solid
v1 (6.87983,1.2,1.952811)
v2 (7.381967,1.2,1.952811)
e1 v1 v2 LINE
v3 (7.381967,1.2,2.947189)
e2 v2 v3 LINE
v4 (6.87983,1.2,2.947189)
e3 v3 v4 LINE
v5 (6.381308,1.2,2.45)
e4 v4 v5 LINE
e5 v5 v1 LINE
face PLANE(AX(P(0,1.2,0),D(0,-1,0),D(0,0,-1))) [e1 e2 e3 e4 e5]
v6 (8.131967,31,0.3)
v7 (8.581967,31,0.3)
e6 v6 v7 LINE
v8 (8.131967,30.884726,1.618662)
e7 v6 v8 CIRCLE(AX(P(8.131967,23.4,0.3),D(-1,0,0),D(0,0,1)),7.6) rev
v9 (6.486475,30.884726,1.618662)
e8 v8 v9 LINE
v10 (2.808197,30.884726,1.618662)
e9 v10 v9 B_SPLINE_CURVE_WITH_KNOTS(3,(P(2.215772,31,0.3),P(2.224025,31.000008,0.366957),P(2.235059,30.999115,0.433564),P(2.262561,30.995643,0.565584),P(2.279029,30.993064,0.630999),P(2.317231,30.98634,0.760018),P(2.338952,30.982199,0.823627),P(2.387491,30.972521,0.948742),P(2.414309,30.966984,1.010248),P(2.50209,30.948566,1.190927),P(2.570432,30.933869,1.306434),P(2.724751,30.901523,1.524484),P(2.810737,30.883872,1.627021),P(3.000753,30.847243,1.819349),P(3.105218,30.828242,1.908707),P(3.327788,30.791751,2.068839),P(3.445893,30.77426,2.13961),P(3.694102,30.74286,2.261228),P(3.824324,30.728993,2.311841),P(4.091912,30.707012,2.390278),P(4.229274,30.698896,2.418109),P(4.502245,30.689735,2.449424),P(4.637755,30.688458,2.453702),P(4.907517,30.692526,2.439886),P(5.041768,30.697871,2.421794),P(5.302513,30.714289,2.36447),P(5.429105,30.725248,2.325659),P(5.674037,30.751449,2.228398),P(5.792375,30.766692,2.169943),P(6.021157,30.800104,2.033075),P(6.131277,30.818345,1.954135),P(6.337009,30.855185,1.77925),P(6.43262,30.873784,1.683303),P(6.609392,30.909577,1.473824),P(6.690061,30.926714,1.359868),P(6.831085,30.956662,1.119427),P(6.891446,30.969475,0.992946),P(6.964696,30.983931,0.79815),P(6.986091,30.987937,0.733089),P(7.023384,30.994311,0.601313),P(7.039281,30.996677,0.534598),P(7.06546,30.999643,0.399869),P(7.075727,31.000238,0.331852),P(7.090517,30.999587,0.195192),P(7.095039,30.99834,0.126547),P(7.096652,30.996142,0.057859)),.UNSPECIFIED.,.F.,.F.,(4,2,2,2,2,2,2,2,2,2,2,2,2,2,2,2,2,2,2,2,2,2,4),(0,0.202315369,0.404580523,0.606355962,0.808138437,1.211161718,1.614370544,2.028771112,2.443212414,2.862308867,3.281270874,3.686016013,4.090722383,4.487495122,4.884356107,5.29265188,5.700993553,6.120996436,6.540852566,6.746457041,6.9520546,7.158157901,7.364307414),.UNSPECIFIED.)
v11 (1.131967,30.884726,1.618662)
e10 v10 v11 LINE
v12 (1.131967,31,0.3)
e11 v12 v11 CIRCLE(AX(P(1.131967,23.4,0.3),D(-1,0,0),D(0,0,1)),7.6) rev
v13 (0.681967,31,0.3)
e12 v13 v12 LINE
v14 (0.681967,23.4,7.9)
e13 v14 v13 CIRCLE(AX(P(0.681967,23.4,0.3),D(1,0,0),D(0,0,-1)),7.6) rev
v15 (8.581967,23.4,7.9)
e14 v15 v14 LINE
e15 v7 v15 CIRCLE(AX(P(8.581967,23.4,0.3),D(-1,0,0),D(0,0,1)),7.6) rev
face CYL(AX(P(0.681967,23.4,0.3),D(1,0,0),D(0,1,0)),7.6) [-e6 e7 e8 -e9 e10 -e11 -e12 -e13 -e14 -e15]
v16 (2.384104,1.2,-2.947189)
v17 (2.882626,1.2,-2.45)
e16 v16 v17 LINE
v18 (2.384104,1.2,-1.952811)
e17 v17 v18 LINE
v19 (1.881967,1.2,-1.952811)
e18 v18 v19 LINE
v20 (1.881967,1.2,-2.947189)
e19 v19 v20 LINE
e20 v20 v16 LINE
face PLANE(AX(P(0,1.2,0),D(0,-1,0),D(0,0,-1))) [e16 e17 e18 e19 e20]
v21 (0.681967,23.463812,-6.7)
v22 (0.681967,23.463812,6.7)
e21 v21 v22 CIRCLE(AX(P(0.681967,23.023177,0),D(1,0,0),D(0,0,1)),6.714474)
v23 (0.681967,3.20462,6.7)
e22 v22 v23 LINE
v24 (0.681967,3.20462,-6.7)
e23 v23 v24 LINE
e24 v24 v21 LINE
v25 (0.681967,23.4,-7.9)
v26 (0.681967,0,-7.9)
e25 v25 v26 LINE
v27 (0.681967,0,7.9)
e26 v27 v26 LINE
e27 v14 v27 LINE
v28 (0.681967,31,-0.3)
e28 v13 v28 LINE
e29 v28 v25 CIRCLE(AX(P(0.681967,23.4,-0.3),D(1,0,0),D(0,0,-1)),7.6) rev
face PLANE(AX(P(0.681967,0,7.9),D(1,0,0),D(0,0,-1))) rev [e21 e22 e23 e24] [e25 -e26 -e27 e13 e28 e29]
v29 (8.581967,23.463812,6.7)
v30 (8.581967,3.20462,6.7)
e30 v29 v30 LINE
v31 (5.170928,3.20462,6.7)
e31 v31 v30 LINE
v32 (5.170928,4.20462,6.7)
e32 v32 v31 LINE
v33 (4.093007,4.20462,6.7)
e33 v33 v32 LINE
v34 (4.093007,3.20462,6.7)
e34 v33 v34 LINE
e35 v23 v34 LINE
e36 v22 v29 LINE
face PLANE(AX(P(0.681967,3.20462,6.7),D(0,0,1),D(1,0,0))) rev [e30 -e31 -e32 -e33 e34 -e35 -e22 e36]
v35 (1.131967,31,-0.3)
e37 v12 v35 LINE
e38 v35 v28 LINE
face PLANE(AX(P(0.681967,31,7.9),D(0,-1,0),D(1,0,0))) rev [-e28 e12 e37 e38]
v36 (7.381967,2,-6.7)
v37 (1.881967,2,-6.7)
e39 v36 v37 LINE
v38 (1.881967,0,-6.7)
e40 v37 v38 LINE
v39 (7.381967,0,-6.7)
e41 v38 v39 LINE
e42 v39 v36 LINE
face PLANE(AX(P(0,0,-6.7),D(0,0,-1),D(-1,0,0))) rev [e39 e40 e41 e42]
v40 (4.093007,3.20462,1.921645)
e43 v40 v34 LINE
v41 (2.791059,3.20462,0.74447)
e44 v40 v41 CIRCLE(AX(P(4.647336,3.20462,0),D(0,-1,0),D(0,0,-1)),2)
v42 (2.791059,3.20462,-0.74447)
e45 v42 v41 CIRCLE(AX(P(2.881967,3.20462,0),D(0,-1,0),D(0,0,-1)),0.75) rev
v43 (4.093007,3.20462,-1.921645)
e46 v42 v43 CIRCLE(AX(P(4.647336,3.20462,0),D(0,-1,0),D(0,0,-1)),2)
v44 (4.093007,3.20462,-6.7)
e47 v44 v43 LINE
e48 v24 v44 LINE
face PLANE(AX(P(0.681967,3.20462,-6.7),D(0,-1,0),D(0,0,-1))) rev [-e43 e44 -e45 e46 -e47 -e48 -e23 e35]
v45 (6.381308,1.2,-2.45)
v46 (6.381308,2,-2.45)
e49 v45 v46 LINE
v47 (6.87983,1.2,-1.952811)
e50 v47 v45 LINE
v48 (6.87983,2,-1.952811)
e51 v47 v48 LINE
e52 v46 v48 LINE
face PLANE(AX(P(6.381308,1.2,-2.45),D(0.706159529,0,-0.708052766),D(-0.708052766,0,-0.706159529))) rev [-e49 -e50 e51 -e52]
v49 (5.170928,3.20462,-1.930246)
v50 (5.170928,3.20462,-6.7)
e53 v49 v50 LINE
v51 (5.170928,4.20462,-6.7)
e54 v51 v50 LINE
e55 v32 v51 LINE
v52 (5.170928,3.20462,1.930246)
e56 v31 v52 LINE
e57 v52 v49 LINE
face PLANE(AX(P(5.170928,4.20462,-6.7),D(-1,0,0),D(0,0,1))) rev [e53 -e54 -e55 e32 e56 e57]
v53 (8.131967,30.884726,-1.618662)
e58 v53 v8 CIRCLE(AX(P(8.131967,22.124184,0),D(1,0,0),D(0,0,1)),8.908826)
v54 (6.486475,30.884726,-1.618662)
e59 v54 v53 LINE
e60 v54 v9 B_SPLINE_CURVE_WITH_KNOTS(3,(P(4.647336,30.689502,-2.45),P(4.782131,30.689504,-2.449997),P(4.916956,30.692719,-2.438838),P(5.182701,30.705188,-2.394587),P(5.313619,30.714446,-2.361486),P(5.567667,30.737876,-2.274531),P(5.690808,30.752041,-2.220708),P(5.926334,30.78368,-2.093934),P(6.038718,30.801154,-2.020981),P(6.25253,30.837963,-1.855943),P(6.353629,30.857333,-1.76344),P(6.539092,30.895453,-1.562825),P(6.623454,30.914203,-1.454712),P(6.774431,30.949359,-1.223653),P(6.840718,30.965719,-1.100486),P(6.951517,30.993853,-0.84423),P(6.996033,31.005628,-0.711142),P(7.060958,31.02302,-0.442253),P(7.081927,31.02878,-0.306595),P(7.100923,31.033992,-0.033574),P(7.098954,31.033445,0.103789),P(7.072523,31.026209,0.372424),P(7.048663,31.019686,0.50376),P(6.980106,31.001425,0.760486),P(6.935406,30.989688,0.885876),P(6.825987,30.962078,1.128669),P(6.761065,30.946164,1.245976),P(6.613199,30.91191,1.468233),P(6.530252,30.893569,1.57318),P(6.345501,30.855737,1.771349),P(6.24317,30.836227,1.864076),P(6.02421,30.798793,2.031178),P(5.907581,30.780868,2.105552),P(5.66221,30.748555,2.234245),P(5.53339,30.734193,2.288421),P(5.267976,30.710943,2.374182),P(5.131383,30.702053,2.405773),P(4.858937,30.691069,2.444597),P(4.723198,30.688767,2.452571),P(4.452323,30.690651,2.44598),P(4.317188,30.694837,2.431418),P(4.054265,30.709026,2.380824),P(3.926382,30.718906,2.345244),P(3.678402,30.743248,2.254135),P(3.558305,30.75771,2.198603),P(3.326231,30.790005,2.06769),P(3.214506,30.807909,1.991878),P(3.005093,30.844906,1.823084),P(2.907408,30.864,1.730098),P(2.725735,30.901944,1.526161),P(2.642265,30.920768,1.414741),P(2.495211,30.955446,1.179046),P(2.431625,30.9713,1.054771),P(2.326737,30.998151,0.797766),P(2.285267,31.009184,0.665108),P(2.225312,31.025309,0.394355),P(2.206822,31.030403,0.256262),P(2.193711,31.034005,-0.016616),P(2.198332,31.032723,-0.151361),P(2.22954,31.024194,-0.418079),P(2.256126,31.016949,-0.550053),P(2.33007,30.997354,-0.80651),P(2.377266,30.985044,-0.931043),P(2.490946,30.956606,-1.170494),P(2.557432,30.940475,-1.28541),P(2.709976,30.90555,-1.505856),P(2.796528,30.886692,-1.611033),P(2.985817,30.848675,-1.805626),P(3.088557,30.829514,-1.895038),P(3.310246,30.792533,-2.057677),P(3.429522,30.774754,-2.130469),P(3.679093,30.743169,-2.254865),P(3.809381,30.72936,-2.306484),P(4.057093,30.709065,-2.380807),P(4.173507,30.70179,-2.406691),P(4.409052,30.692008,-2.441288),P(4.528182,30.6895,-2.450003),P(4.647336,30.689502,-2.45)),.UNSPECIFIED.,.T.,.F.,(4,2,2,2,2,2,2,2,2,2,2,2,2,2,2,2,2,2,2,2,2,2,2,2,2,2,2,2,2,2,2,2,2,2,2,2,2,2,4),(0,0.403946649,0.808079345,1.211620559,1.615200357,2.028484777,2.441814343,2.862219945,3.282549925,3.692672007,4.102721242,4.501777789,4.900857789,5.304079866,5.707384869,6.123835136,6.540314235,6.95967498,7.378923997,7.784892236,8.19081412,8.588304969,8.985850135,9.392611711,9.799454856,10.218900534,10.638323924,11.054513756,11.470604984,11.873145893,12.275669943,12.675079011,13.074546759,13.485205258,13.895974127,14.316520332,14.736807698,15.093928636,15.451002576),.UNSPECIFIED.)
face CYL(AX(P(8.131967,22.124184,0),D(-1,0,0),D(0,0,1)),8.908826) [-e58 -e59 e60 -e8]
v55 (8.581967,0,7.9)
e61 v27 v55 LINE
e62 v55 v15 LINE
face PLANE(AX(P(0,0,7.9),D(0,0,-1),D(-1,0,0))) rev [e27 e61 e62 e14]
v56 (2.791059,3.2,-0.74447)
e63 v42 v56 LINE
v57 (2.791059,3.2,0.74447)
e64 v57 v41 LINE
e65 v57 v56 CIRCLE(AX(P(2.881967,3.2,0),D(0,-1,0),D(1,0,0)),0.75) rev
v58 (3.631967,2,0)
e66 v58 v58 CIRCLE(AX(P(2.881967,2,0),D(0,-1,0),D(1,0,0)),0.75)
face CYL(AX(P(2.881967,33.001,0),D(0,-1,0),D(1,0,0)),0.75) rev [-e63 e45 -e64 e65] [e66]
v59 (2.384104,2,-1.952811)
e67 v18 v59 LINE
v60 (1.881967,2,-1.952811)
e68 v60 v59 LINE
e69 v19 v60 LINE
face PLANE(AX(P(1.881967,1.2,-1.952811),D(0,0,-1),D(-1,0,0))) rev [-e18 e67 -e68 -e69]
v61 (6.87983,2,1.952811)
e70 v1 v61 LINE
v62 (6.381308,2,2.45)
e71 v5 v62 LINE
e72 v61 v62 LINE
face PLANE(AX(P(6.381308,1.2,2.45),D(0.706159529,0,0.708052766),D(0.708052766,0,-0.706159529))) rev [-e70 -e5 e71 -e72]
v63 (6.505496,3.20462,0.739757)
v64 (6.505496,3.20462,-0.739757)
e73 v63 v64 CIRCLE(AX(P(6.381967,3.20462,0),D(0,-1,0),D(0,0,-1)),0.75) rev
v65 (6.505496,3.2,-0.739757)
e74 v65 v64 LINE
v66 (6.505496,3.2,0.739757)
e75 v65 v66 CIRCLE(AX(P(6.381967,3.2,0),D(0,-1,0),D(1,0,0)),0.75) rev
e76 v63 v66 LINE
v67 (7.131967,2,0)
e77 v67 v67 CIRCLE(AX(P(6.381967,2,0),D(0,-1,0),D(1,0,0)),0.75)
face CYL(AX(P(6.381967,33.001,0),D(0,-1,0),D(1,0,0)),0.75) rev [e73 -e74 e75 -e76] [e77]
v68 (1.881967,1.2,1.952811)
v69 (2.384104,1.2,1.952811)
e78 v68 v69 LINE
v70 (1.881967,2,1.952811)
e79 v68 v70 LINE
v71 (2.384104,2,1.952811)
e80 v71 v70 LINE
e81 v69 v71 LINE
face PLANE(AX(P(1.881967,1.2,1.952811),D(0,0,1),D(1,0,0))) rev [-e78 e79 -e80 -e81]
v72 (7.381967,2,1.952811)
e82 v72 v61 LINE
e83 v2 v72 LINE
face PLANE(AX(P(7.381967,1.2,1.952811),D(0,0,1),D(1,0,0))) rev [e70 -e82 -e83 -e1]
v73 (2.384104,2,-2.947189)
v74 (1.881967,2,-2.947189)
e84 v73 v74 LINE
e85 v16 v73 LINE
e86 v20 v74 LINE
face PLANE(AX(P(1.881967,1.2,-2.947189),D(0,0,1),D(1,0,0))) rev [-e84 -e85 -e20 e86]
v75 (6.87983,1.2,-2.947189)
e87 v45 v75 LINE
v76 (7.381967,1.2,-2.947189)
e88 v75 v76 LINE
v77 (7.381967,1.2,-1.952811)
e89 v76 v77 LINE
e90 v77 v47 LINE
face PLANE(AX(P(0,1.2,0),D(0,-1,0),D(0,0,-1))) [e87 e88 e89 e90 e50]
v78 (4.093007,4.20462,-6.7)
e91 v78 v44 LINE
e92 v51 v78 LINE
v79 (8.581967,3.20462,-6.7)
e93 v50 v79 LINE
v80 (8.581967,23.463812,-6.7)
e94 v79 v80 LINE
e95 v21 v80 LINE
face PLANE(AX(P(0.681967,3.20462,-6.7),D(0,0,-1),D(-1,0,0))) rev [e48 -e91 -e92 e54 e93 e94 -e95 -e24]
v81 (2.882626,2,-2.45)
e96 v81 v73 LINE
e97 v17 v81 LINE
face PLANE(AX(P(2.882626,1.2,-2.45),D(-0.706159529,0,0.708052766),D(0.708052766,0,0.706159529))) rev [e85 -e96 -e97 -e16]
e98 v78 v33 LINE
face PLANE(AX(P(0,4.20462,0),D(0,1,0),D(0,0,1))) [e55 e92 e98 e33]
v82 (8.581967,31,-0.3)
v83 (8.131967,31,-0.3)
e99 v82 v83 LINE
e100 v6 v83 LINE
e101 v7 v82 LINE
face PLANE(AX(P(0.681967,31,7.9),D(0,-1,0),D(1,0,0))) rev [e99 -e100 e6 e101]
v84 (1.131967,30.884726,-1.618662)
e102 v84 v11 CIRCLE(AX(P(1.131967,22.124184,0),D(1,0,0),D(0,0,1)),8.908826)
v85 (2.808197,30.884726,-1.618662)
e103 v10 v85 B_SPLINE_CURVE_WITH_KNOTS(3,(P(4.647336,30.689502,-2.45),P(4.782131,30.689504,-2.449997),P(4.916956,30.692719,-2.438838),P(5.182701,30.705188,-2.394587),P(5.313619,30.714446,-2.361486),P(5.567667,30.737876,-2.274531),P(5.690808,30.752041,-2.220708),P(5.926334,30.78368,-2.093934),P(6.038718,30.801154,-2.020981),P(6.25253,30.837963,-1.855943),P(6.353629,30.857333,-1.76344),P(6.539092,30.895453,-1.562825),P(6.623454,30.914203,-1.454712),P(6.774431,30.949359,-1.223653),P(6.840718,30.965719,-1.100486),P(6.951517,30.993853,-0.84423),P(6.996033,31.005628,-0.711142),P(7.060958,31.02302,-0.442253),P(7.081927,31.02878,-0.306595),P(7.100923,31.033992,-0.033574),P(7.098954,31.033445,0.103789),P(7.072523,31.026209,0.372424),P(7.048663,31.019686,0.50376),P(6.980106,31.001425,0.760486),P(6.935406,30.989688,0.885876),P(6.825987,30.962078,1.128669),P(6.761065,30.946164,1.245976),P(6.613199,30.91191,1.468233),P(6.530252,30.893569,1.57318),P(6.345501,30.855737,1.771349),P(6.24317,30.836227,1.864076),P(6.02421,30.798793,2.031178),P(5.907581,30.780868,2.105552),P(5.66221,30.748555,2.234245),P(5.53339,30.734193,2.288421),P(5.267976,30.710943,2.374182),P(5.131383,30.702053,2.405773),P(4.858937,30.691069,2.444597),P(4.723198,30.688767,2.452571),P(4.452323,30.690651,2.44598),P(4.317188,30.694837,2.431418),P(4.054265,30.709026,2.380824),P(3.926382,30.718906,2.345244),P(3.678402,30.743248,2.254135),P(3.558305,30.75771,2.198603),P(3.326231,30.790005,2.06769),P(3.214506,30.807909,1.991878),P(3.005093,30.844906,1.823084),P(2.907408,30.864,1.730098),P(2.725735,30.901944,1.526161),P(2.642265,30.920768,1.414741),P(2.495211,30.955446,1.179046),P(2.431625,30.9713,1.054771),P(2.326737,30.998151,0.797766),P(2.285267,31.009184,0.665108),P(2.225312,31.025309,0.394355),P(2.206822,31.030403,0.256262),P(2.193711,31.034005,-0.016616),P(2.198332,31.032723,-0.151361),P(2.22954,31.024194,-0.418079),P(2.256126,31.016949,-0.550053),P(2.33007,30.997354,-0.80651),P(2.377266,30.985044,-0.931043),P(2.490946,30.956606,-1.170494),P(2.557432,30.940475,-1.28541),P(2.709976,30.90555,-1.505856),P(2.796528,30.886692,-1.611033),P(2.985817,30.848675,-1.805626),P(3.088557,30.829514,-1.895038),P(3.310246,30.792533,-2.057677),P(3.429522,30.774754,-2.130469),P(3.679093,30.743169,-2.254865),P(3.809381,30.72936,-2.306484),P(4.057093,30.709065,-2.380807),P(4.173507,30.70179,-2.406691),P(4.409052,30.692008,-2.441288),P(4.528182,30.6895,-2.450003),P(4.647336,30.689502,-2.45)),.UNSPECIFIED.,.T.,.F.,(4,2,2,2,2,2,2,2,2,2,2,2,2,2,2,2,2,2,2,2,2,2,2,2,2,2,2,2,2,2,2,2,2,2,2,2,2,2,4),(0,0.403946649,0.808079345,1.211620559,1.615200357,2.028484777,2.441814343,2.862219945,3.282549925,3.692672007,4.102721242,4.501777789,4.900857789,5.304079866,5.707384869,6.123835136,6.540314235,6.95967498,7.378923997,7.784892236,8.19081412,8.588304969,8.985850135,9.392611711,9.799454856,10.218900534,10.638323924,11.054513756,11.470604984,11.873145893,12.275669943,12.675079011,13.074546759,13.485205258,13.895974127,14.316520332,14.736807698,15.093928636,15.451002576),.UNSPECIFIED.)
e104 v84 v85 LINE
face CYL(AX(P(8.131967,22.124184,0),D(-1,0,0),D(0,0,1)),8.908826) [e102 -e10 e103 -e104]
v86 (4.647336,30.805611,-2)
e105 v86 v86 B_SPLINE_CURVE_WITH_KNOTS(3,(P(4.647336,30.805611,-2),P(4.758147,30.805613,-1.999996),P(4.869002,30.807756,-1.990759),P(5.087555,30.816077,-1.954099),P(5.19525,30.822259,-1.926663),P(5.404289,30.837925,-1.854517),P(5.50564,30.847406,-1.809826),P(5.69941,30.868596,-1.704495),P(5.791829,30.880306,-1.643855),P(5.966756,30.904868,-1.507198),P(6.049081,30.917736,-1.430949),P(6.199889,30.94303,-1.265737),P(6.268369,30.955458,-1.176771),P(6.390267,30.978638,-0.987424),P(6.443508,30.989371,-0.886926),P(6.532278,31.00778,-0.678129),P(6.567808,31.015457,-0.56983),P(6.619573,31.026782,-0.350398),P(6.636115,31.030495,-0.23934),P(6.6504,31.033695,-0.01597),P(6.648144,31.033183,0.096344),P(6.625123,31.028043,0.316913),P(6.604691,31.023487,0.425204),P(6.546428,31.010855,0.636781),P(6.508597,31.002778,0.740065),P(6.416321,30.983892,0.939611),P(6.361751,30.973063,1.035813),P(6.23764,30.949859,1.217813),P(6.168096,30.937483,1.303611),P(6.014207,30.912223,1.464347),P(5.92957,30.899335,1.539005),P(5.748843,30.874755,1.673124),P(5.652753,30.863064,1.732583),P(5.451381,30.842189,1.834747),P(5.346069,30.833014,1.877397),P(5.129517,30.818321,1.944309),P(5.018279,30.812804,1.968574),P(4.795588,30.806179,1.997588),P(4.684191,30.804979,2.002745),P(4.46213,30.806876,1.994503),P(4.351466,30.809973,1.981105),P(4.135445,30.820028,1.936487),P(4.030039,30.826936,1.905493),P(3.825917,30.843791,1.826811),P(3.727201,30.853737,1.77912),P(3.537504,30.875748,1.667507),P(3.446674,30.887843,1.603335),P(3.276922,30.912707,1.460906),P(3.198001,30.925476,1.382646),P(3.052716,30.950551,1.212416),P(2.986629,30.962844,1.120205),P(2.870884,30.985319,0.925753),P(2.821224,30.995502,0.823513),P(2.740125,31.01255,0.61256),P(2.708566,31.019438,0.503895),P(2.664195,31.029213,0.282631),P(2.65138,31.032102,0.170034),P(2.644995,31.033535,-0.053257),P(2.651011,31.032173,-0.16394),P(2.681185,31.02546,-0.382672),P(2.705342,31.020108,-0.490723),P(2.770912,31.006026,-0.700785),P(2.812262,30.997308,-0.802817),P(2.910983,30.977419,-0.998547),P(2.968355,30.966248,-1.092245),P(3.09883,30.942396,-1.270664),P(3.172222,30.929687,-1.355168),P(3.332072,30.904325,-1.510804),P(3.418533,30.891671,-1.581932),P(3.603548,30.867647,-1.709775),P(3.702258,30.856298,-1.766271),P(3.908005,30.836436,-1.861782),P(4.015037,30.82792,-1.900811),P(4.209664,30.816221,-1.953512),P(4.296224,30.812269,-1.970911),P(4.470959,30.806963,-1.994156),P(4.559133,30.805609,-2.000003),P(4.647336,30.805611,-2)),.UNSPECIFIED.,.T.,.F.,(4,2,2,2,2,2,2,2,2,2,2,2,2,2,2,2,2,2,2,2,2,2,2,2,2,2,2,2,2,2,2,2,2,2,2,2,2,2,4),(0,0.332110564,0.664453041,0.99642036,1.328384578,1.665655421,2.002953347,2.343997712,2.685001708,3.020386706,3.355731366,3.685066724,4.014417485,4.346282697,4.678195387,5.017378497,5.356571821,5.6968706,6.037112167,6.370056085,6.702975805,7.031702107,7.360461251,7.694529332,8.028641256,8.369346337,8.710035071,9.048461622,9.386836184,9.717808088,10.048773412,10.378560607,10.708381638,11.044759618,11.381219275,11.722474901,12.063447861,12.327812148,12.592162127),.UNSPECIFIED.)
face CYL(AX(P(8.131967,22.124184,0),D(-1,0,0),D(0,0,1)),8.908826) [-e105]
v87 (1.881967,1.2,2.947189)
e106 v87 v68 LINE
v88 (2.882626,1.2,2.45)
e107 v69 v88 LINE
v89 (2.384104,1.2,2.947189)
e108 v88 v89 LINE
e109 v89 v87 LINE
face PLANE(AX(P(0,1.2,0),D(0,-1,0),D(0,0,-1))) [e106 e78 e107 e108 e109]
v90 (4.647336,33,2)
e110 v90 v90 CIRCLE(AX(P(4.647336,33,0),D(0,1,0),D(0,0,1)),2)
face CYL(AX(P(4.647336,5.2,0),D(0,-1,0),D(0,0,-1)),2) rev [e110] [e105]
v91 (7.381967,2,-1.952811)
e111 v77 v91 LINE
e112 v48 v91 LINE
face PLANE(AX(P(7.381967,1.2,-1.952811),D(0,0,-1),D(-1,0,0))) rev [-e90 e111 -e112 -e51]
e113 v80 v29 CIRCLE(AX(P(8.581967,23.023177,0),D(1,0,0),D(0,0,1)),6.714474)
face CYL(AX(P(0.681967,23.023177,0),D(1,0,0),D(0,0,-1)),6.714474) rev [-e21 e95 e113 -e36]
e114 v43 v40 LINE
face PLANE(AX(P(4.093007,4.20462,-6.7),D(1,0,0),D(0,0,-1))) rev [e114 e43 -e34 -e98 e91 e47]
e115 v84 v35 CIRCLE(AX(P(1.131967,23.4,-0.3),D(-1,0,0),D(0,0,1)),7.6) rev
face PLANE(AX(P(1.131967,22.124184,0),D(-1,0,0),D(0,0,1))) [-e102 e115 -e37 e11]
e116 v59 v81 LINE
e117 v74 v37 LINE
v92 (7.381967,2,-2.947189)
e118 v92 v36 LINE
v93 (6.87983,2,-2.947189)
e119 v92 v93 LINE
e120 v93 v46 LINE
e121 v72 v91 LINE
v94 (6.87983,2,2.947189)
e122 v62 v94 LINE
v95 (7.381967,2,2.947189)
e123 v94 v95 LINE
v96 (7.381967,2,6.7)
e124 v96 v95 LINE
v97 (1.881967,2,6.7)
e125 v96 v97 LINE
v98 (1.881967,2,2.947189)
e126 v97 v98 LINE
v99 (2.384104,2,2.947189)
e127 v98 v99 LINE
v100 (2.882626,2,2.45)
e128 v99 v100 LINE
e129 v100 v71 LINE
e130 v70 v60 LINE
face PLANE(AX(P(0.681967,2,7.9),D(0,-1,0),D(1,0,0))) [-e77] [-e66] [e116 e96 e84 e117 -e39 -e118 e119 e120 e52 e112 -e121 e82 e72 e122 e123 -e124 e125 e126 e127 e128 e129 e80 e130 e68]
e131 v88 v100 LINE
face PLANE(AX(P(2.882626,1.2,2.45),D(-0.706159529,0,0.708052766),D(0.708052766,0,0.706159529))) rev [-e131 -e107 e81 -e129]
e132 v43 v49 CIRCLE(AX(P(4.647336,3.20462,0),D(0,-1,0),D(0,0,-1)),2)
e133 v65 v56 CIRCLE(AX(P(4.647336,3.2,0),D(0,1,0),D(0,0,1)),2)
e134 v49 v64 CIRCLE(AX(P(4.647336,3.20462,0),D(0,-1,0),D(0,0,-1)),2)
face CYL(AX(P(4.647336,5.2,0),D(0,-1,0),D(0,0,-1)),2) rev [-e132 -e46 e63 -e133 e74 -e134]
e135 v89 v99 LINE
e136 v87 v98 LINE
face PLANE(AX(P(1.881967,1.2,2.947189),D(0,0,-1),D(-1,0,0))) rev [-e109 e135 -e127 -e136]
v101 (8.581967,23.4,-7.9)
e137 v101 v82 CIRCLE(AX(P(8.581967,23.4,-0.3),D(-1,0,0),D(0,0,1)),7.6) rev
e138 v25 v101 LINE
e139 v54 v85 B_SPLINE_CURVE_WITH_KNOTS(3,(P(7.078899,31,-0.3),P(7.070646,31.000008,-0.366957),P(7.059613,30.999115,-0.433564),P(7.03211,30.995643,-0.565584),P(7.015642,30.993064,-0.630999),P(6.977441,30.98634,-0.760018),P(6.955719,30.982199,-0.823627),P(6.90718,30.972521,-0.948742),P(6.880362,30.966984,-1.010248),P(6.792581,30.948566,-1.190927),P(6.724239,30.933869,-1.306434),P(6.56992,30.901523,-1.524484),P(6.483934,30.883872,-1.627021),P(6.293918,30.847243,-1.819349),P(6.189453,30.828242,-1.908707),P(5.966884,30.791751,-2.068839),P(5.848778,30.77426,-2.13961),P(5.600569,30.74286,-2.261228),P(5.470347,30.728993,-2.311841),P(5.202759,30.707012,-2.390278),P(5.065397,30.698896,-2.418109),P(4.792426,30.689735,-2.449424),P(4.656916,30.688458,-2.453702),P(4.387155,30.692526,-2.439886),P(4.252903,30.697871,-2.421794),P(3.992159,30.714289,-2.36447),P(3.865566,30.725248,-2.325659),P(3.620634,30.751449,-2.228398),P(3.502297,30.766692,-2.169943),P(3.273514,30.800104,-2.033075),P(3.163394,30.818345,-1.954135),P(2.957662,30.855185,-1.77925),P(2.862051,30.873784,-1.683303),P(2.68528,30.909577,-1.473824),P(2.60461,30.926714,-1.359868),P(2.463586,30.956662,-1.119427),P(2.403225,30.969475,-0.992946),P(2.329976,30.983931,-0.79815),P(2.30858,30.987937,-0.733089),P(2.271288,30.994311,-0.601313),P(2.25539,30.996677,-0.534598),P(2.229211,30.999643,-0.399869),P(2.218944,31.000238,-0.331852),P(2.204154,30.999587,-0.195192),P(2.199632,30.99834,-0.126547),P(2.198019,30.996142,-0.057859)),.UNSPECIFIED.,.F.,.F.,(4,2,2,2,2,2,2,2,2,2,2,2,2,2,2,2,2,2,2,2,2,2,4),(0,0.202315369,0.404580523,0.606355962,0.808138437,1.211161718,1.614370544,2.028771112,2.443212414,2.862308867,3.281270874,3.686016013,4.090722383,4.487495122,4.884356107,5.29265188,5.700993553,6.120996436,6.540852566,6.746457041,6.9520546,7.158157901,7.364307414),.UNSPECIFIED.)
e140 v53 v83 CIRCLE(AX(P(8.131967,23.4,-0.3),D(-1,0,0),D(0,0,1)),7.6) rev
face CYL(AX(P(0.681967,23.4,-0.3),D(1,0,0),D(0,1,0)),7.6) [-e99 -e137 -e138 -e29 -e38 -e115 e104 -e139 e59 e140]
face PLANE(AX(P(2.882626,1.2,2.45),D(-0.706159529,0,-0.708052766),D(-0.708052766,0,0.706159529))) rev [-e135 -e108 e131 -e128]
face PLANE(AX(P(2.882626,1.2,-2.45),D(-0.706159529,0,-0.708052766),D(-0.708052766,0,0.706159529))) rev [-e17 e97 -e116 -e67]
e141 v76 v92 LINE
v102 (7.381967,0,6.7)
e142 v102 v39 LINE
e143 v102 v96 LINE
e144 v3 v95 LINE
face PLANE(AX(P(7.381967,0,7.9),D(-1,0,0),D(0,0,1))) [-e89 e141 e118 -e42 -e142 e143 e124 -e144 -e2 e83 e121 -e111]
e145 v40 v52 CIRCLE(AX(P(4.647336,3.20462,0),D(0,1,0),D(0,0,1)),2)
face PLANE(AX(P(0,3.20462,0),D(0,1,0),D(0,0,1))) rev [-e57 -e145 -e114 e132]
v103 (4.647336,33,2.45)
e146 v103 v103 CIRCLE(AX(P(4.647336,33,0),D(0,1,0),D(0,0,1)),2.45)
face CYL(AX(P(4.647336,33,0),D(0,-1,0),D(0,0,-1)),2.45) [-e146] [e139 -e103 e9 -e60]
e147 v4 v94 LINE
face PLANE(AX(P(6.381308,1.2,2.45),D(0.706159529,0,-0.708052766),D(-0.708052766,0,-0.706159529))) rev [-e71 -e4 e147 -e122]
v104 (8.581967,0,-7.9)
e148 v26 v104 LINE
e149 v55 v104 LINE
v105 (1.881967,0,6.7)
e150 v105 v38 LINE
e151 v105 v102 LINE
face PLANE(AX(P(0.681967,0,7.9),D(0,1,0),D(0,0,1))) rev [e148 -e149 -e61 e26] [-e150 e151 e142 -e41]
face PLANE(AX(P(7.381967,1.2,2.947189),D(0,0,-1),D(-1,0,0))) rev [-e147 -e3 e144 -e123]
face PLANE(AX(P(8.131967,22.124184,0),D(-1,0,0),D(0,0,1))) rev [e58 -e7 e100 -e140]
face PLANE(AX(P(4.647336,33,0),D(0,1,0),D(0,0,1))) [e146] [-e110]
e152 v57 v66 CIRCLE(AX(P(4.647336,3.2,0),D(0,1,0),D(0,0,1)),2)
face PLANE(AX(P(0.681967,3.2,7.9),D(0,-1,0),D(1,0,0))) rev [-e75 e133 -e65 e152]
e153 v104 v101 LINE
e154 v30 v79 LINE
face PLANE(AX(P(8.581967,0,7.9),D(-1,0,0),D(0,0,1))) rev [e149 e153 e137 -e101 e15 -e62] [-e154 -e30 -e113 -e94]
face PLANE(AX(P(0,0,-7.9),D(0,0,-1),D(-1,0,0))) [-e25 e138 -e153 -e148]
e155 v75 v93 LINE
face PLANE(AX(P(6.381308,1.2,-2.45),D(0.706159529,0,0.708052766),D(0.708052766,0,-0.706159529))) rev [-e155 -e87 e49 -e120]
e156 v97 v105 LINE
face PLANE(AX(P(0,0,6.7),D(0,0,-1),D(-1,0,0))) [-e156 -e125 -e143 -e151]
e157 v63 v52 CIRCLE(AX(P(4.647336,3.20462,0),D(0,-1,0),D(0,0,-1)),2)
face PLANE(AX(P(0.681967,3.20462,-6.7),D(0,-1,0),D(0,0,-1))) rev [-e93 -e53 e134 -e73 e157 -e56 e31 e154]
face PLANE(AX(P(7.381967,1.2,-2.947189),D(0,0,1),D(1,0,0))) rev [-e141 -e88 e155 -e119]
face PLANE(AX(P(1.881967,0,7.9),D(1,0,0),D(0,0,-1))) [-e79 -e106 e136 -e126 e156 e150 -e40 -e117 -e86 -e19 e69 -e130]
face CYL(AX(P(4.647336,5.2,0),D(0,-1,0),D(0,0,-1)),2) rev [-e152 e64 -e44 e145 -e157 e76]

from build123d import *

# Parameters (mm, degrees)
MAINBASESKETCH_W                 = 7.9
MAINBASESKETCH_H                 = 3.2
MAINBASEEXTRUDE_DEPTH            = 7.9
MAINBASESHELL_T                  = -1.2
SLIMYELLOWUNDEREXT_START         = -0.2
SLIMYELLOWUNDEREXT_DEPTH         = 1
SLIMYELLLOWUPPERCIRCLESKETCH_R   = 2.45
SLIMYELLLOWUPPERCIRCLESKETCH_R_2 = 2
SLIMYELLOWUPPERCIRCLE_DEPTH      = 2
MOVE_START                       = 3.2
MOVE_FACE2_OUTLINE_W             = 7.9
MOVE_FACE2_OUTLINE_H             = 15.8
MOVE_FACE2_OUTLINE_R             = 2
MOVE_FACE2_DEPTH                 = 27.8
MOVE_START_2                     = 31
MOVE_FACE2_2_OUTLINE_R           = 2.45
MOVE_FACE2_2_OUTLINE_R_2         = 2
MOVE_FACE2_2_DEPTH               = 2
FILLET25_R                       = 7.6
FILLET26_R                       = 7.6
CUT_EXTRUDE55_DEPTH              = 35.839919773
CUT_EXTRUDE57_REACH              = 35.122
SKETCH160_R                      = 0.75
BOSS_EXTRUDE20_DEPTH             = 3.5
SKETCH162_W                      = 1.07792119
SKETCH162_H                      = 13.4
BOSS_EXTRUDE21_DEPTH             = 1


# Read off the part's stored shape, not the designer's step: Move Face2
with BuildPart() as part:
    # MainBaseSketch → MainBaseExtrude (new, symmetric)
    with BuildSketch(Plane.XY):
        with Locations((4.631967213, 1.6)):
            Rectangle(MAINBASESKETCH_W, MAINBASESKETCH_H)
    extrude(amount=MAINBASEEXTRUDE_DEPTH, both=True)

    # MainBaseShell
    mainbaseshell_openings = [part.faces().sort_by_distance(p)[0] for p in [
        (4.631967213, 0, 0),
    ]]
    offset(amount=MAINBASESHELL_T, openings=mainbaseshell_openings, kind=Kind.INTERSECTION)

    # SlimYellowUnderExtSketch → SlimYellowUnderExt (add)
    with BuildSketch(Plane.XZ.offset(-2).offset(SLIMYELLOWUNDEREXT_START)):
        Polygon((1.881967213, 1.952811318), (1.881967213, 2.947188682), (2.384104441, 2.947188682), (2.882626102, 2.45), (2.384104441, 1.952811318), align=None)
        Polygon((6.381308324, 2.45), (6.879829986, 2.947188682), (7.381967213, 2.947188682), (7.381967213, 1.952811318), (6.879829986, 1.952811318), align=None)
        Polygon((1.881967213, -1.952811318), (2.384104441, -1.952811318), (2.882626102, -2.45), (2.384104441, -2.947188682), (1.881967213, -2.947188682), align=None)
        Polygon((7.381967213, -1.952811318), (7.381967213, -2.947188682), (6.879829986, -2.947188682), (6.381308324, -2.45), (6.879829986, -1.952811318), align=None)
    extrude(amount=SLIMYELLOWUNDEREXT_DEPTH)

    # SlimYelllowUpperCircleSketch → SlimYellowUpperCircle (add)
    with BuildSketch(Plane(origin=(0, 3.2, 0), x_dir=(1, 0, 0), z_dir=(0, 1, 0))):
        with Locations((4.647335619, 0)):
            Circle(SLIMYELLLOWUPPERCIRCLESKETCH_R)
        with Locations(Location((4.647335619, 0, 0), (0, 0, 270))):
            Circle(SLIMYELLLOWUPPERCIRCLESKETCH_R_2, mode=Mode.SUBTRACT)
    extrude(amount=SLIMYELLOWUPPERCIRCLE_DEPTH)

    # Move Face2 outline → Move Face2 (add)
    with BuildSketch(Plane(origin=(0, 0, 0), x_dir=(1, 0, 0), z_dir=(0, 1, 0)).offset(MOVE_START)):
        with Locations((4.631967213, 0)):
            Rectangle(MOVE_FACE2_OUTLINE_W, MOVE_FACE2_OUTLINE_H)
        with Locations((4.647335619, 0)):
            Circle(MOVE_FACE2_OUTLINE_R, mode=Mode.SUBTRACT)
    extrude(amount=MOVE_FACE2_DEPTH)

    # Move Face2 2 outline → Move Face2 2 (add)
    with BuildSketch(Plane(origin=(0, 0, 0), x_dir=(1, 0, 0), z_dir=(0, 1, 0)).offset(MOVE_START_2)):
        with Locations((4.647335619, 0)):
            Circle(MOVE_FACE2_2_OUTLINE_R)
        with Locations((4.647335619, 0)):
            Circle(MOVE_FACE2_2_OUTLINE_R_2, mode=Mode.SUBTRACT)
    extrude(amount=MOVE_FACE2_2_DEPTH)

    # Fillet25
    # the kernel refuses this fillet: 7.6 mm, written as the material it takes off along each edge
    with BuildSketch(Plane(origin=(0.681967213, 31, 7.9), x_dir=(0, 0, -1), z_dir=(1, 0, 0))) as fillet25_piece_1_section:
        with BuildLine():
            CenterArc((FILLET25_R, -FILLET25_R), FILLET25_R, 90, 90)
            Line((0, -FILLET25_R), (-FILLET25_R * 0.02, -FILLET25_R))
            Line((-FILLET25_R * 0.02, -FILLET25_R), (-FILLET25_R * 0.02, FILLET25_R * 0.02))
            Line((-FILLET25_R * 0.02, FILLET25_R * 0.02), (FILLET25_R, FILLET25_R * 0.02))
            Line((FILLET25_R, FILLET25_R * 0.02), (FILLET25_R, 0))
        make_face()
    fillet25_piece_1 = extrude(amount=7.9, mode=Mode.PRIVATE)
    fillet25_piece_1 = fillet25_piece_1 - Plane(origin=(4.647335619, 29.251763141, 0), x_dir=(1, 0, 0), z_dir=(0, -1, 0)) * Cylinder(2.45, 47, mode=Mode.PRIVATE)
    add(fillet25_piece_1, mode=Mode.SUBTRACT)

    # Fillet26
    # the kernel refuses this fillet: 7.6 mm, written as the material it takes off along each edge
    with BuildSketch(Plane(origin=(27.581967213, 31, -7.9), x_dir=(0, 0, 1), z_dir=(-1, 0, 0))) as fillet26_piece_1_section:
        with BuildLine():
            CenterArc((FILLET26_R, -FILLET26_R), FILLET26_R, 90, 90)
            Line((0, -FILLET26_R), (0, 0))
            Line((0, 0), (FILLET26_R, 0))
        make_face()
    fillet26_piece_1 = extrude(amount=45.9, mode=Mode.PRIVATE)
    fillet26_piece_1 = fillet26_piece_1 - Plane(origin=(4.647335619, 29.29236393, 0), x_dir=(1, 0, 0), z_dir=(0, -1, 0)) * Cylinder(2.45, 123, mode=Mode.PRIVATE)
    add(fillet26_piece_1, mode=Mode.SUBTRACT)

    # Sketch159 → Cut-Extrude55 (cut, through all)
    with BuildSketch(Plane(origin=(8.581967213, 0, 0), x_dir=(0, 0, -1), z_dir=(1, 0, 0))):
        with BuildLine():
            Line((6.7, 3.204620212), (6.7, 23.463811934))
            ThreePointArc((6.7, 23.463811934), (0, 29.737650856), (-6.7, 23.463811934))
            Line((-6.7, 23.463811934), (-6.7, 3.204620212))
            Line((-6.7, 3.204620212), (6.7, 3.204620212))
        make_face()
    extrude(amount=-CUT_EXTRUDE55_DEPTH, mode=Mode.SUBTRACT)

    # Sketch160 → Cut-Extrude57 (cut, up to next)
    with BuildSketch(Plane(origin=(0, 2, 0), x_dir=(-1, 0, 0), z_dir=(0, -1, 0)), mode=Mode.PRIVATE) as cut_extrude57_sk1:
        with Locations(Location((-6.381967213, 0, 0), (0, 0, 180))):
            Circle(SKETCH160_R)
    cut_extrude57_tool1 = extrude(cut_extrude57_sk1.sketch, amount=-CUT_EXTRUDE57_REACH, mode=Mode.PRIVATE) & part.part
    # Sketch160 → Cut-Extrude57 (cut, up to next)
    with BuildSketch(Plane(origin=(0, 2, 0), x_dir=(-1, 0, 0), z_dir=(0, -1, 0)), mode=Mode.PRIVATE) as cut_extrude57_sk2:
        with Locations(Location((-2.881967213, 0, 0), (0, 0, 180))):
            Circle(SKETCH160_R)
    cut_extrude57_tool2 = extrude(cut_extrude57_sk2.sketch, amount=-CUT_EXTRUDE57_REACH, mode=Mode.PRIVATE) & part.part
    add(cut_extrude57_tool1.solids().sort_by_distance((6.381967, 2, 0))[0], mode=Mode.SUBTRACT)
    add(cut_extrude57_tool2.solids().sort_by_distance((2.881967, 2, 0))[0], mode=Mode.SUBTRACT)

    # Sketch161 → Boss-Extrude20 (add, symmetric)
    with BuildSketch(Plane(origin=(4.631967213, 0, 0), x_dir=(0, 0, -1), z_dir=(1, 0, 0))):
        with BuildLine():
            Line((2.455062292, 30.688052313), (2.455062292, 30.469179439))
            Line((2.455062292, 30.469179439), (2.455062292, 29.272723248))
            ThreePointArc((2.455062292, 29.272723248), (0, 29.737650856), (-2.455062292, 29.272723248))
            Line((-2.455062292, 29.272723248), (-2.455062292, 30.526922148))
            Line((-2.455062292, 30.526922148), (-2.455062292, 30.688052313))
            ThreePointArc((-2.455062292, 30.688052313), (0, 31.033009473), (2.455062292, 30.688052313))
        make_face()
    extrude(amount=BOSS_EXTRUDE20_DEPTH, both=True)

    # Sketch162 → Boss-Extrude21 (add)
    with BuildSketch(Plane(origin=(0, 3.204620212, 0), x_dir=(1, 0, 0), z_dir=(0, 1, 0))):
        with Locations((4.631967213, 0)):
            Rectangle(SKETCH162_W, SKETCH162_H)
    extrude(amount=BOSS_EXTRUDE21_DEPTH)


solid = part.part
